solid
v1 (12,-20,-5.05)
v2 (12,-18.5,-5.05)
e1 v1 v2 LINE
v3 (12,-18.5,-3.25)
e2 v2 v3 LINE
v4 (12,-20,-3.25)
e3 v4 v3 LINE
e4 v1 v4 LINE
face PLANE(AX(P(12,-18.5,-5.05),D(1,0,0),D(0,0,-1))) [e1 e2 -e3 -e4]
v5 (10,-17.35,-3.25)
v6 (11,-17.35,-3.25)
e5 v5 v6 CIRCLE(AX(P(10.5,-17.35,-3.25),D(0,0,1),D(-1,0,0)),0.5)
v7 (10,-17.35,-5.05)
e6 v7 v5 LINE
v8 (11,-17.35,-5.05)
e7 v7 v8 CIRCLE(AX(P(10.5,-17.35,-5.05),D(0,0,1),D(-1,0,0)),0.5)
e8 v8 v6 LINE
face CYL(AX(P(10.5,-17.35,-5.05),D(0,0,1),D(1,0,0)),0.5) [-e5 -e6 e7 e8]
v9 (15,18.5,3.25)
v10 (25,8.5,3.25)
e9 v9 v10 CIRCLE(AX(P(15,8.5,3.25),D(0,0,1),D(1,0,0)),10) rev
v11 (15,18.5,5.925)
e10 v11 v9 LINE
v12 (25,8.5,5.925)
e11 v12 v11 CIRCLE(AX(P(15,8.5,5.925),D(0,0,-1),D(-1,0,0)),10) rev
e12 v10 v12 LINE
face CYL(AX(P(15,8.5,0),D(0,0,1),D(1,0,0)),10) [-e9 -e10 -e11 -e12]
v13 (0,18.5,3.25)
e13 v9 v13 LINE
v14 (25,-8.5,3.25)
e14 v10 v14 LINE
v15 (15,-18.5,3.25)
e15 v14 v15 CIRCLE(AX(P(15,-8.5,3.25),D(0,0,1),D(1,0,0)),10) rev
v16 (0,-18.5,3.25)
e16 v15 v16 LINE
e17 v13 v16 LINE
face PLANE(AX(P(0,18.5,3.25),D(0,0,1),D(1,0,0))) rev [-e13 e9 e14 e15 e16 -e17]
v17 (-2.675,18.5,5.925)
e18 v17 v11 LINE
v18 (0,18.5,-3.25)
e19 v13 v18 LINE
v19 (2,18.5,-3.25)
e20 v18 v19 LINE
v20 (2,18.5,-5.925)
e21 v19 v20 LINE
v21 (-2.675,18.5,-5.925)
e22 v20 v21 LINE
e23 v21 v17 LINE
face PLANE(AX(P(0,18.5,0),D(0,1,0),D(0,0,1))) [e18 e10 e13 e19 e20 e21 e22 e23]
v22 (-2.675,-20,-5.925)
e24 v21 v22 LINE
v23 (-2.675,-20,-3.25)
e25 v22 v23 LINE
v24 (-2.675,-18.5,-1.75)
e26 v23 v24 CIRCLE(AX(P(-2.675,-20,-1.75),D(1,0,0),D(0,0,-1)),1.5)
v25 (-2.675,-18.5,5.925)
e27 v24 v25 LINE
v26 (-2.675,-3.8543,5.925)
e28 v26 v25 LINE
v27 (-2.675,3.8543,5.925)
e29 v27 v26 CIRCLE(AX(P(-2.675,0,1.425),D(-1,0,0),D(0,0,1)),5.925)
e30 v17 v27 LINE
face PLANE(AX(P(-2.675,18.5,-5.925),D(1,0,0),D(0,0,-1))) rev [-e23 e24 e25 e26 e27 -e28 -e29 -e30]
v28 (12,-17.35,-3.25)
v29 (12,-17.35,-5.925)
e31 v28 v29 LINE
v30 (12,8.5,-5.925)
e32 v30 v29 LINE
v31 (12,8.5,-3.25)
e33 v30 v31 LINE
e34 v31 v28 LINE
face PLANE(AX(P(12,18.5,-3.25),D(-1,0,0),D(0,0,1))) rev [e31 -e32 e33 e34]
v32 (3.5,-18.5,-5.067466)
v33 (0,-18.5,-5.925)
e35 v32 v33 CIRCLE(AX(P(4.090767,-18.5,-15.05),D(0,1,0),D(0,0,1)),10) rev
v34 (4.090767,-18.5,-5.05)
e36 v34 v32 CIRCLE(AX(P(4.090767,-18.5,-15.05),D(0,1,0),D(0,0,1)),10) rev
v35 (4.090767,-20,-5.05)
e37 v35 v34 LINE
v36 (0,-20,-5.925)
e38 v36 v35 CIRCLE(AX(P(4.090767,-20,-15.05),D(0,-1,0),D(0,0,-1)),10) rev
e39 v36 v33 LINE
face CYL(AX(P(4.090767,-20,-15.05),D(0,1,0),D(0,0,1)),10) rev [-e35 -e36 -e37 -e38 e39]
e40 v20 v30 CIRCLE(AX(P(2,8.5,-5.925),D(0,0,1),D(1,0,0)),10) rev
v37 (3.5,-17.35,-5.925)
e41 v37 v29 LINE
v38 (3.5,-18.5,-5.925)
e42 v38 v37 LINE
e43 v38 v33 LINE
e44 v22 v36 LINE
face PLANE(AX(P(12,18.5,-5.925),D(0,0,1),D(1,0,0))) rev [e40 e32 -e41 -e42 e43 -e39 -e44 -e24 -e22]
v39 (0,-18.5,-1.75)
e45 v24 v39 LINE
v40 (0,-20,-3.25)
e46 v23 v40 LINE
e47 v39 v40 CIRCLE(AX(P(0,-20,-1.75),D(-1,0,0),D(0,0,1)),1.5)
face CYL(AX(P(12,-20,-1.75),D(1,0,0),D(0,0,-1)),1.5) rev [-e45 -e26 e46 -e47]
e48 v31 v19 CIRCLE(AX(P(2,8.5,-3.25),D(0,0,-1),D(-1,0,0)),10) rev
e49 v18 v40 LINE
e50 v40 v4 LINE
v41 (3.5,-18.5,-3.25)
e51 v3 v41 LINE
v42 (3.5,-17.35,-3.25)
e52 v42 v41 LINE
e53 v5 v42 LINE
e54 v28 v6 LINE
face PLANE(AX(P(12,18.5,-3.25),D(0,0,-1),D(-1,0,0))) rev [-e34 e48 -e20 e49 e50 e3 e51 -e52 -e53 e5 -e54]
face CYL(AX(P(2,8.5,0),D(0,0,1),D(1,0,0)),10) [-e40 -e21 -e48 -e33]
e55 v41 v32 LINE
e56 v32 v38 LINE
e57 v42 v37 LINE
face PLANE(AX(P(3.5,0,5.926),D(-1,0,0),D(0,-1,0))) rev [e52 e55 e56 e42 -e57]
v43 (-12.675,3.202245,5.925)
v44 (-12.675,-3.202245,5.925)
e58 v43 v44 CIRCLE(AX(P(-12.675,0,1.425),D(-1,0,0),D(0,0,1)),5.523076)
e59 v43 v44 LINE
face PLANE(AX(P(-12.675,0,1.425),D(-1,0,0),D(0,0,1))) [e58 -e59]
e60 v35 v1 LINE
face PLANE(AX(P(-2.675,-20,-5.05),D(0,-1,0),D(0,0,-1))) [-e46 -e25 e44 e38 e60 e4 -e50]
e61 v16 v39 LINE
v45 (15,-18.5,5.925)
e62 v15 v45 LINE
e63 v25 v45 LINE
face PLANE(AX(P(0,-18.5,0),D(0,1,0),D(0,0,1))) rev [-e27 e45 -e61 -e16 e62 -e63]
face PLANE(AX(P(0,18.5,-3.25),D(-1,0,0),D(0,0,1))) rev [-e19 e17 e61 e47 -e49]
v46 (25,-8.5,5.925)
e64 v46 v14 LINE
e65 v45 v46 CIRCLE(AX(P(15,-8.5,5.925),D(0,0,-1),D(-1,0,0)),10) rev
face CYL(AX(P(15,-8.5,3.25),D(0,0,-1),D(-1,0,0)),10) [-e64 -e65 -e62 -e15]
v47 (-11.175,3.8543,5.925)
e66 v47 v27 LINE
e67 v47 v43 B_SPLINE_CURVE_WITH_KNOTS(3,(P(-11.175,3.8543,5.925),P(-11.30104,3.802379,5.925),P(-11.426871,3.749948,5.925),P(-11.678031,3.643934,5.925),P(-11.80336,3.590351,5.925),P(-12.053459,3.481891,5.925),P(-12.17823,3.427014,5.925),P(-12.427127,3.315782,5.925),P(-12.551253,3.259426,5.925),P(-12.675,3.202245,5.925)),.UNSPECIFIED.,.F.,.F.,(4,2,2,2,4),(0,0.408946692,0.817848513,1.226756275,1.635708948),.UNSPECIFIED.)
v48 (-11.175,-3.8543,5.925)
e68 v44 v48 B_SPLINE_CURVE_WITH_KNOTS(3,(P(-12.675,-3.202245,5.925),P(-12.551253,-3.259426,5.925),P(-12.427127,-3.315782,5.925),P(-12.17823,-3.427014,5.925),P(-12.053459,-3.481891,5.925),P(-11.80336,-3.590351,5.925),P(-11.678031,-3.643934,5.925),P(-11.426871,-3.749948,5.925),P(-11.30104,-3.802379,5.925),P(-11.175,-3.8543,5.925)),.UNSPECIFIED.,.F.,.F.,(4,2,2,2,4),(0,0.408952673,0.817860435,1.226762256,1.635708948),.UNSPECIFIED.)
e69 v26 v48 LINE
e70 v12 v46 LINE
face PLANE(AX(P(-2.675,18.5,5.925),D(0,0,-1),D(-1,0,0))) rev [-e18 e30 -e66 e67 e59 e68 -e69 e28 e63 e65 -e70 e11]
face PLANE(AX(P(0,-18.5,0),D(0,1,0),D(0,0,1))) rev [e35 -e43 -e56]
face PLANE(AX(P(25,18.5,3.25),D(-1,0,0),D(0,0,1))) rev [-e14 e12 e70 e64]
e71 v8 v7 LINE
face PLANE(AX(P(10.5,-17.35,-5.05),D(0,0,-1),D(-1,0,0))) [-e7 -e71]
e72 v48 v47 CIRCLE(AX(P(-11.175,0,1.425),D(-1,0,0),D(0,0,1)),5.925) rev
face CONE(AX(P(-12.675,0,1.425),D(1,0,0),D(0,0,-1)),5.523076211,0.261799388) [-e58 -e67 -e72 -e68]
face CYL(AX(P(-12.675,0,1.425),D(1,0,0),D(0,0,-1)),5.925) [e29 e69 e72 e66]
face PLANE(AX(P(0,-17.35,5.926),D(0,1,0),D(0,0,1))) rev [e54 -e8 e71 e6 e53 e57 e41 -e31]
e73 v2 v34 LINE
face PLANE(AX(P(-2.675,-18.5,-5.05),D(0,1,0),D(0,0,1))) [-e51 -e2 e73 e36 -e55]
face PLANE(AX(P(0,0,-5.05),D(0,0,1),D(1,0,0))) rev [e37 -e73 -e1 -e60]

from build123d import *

# Parameters (mm, degrees)
BOSS_EXTRUDE1_DEPTH = 18.5
SKETCH3_R           = 5.925
BOSS_EXTRUDE2_DEPTH = 10
SKETCH5_W           = 13.896314966
SKETCH5_H           = 3.370486285
CUT_EXTRUDE2_DEPTH  = 46.255082587
CHAMFER1_SIZE       = 1.5
CHAMFER1_SIZE2      = 0.401923789
CUT_EXTRUDE4_REACH  = 35.282
SKETCH7_W           = 8.5
SKETCH7_H           = 1.15
SKETCH9_W           = 14.675
SKETCH9_H           = 1.5
BOSS_EXTRUDE5_DEPTH = 1.8
FILLET8_R           = 1.5
SKETCH10_W          = 2.675
SKETCH10_H          = 1.5
BOSS_EXTRUDE6_DEPTH = 0.875
FILLET9_R           = 10
FILLET10_R          = 10


# Some blends are built 0.0001 mm under size
with BuildPart() as part:
    # Sketch2 → Boss-Extrude1 (new, symmetric)
    with BuildSketch(Plane(origin=(0, 0, 0), x_dir=(1, 0, 0), z_dir=(0, 1, 0))):
        Polygon((12, 3.25), (0, 3.25), (0, -3.25), (25, -3.25), (25, -5.925), (-2.675, -5.925), (-2.675, 5.925), (12, 5.925), align=None)
    extrude(amount=BOSS_EXTRUDE1_DEPTH, both=True)

    # Sketch3 → Boss-Extrude2 (add)
    with BuildSketch(Plane.ZY.offset(2.675)):
        with Locations(Location((1.425, 0, 0), (0, 0, 319.419581344))):
            Circle(SKETCH3_R)
    extrude(amount=BOSS_EXTRUDE2_DEPTH)

    # Sketch5 → Cut-Extrude2 (cut, through all)
    with BuildSketch(Plane(origin=(0, 18.5, 0), x_dir=(1, 0, 0), z_dir=(0, 1, 0))):
        with Locations((-9.623157483, -7.610243143)):
            Rectangle(SKETCH5_W, SKETCH5_H)
    extrude(amount=-CUT_EXTRUDE2_DEPTH, mode=Mode.SUBTRACT)

    # Chamfer1
    chamfer1_edges = [part.edges().sort_by_distance(p)[0] for p in [
        (-12.675, 0, -4.5),
    ]]
    chamfer1_side = [part.faces().sort_by_distance(p)[0] for p in [
        (-7.675, 0, -4.5),
    ]]
    chamfer(chamfer1_edges, length=CHAMFER1_SIZE, length2=CHAMFER1_SIZE2, reference=chamfer1_side[0])

    # Sketch7 → Cut-Extrude4 (cut, up to next)
    with BuildSketch(Plane(origin=(0, 0, -5.925), x_dir=(-1, 0, 0), z_dir=(0, 0, -1)), mode=Mode.PRIVATE) as cut_extrude4_sk1:
        with Locations((-7.75, -17.925)):
            Rectangle(SKETCH7_W, SKETCH7_H)
    cut_extrude4_tool1 = extrude(cut_extrude4_sk1.sketch, amount=-CUT_EXTRUDE4_REACH, mode=Mode.PRIVATE) & part.part
    add(cut_extrude4_tool1.solids().sort_by_distance((7.75, -17.925, -5.925))[0], mode=Mode.SUBTRACT)

    # Sketch9 → Boss-Extrude5 (add)
    with BuildSketch(Plane.XY.offset(-3.25)):
        with Locations((4.6625, -19.25)):
            Rectangle(SKETCH9_W, SKETCH9_H)
        with BuildLine():
            Line((11, -17.35), (10, -17.35))
            ThreePointArc((10, -17.35), (10.5, -17.85), (11, -17.35))
        make_face()
    extrude(amount=-BOSS_EXTRUDE5_DEPTH)

    # Fillet8
    fillet8_edges = [part.edges().sort_by_distance(p)[0] for p in [
        (-1.3375, -18.5, -3.25),
    ]]
    fillet(fillet8_edges, radius=FILLET8_R - 0.0001)  # a hair under: the kernel refuses the full size

    # Sketch10 → Boss-Extrude6 (add)
    with BuildSketch(Plane(origin=(0, 0, -5.05), x_dir=(-1, 0, 0), z_dir=(0, 0, -1))):
        with Locations((1.3375, -19.25)):
            Rectangle(SKETCH10_W, SKETCH10_H)
    extrude(amount=BOSS_EXTRUDE6_DEPTH)

    # Fillet9
    # the kernel refuses this fillet: 10 mm, written as the material it adds along each edge
    with BuildSketch(Plane(origin=(0, -20, -5.05), x_dir=(1, 0, 0), z_dir=(0, 1, 0))) as fillet9_piece_1:
        with BuildLine():
            CenterArc((4.090767043, 10), FILLET9_R, 245.853152003, 24.146847997)
            Line((0, 0.875), (0, 0))
            Line((0, 0), (4.090767043, 0))
        make_face()
    extrude(amount=1.5)

    # Fillet10
    fillet10_edges = [part.edges().sort_by_distance(p)[0] for p in [
        (25, 18.5, 4.5875),
        (12, 18.5, -4.5875),
        (25, -18.5, 4.5875),
    ]]
    fillet(fillet10_edges, radius=FILLET10_R)


solid = part.part
